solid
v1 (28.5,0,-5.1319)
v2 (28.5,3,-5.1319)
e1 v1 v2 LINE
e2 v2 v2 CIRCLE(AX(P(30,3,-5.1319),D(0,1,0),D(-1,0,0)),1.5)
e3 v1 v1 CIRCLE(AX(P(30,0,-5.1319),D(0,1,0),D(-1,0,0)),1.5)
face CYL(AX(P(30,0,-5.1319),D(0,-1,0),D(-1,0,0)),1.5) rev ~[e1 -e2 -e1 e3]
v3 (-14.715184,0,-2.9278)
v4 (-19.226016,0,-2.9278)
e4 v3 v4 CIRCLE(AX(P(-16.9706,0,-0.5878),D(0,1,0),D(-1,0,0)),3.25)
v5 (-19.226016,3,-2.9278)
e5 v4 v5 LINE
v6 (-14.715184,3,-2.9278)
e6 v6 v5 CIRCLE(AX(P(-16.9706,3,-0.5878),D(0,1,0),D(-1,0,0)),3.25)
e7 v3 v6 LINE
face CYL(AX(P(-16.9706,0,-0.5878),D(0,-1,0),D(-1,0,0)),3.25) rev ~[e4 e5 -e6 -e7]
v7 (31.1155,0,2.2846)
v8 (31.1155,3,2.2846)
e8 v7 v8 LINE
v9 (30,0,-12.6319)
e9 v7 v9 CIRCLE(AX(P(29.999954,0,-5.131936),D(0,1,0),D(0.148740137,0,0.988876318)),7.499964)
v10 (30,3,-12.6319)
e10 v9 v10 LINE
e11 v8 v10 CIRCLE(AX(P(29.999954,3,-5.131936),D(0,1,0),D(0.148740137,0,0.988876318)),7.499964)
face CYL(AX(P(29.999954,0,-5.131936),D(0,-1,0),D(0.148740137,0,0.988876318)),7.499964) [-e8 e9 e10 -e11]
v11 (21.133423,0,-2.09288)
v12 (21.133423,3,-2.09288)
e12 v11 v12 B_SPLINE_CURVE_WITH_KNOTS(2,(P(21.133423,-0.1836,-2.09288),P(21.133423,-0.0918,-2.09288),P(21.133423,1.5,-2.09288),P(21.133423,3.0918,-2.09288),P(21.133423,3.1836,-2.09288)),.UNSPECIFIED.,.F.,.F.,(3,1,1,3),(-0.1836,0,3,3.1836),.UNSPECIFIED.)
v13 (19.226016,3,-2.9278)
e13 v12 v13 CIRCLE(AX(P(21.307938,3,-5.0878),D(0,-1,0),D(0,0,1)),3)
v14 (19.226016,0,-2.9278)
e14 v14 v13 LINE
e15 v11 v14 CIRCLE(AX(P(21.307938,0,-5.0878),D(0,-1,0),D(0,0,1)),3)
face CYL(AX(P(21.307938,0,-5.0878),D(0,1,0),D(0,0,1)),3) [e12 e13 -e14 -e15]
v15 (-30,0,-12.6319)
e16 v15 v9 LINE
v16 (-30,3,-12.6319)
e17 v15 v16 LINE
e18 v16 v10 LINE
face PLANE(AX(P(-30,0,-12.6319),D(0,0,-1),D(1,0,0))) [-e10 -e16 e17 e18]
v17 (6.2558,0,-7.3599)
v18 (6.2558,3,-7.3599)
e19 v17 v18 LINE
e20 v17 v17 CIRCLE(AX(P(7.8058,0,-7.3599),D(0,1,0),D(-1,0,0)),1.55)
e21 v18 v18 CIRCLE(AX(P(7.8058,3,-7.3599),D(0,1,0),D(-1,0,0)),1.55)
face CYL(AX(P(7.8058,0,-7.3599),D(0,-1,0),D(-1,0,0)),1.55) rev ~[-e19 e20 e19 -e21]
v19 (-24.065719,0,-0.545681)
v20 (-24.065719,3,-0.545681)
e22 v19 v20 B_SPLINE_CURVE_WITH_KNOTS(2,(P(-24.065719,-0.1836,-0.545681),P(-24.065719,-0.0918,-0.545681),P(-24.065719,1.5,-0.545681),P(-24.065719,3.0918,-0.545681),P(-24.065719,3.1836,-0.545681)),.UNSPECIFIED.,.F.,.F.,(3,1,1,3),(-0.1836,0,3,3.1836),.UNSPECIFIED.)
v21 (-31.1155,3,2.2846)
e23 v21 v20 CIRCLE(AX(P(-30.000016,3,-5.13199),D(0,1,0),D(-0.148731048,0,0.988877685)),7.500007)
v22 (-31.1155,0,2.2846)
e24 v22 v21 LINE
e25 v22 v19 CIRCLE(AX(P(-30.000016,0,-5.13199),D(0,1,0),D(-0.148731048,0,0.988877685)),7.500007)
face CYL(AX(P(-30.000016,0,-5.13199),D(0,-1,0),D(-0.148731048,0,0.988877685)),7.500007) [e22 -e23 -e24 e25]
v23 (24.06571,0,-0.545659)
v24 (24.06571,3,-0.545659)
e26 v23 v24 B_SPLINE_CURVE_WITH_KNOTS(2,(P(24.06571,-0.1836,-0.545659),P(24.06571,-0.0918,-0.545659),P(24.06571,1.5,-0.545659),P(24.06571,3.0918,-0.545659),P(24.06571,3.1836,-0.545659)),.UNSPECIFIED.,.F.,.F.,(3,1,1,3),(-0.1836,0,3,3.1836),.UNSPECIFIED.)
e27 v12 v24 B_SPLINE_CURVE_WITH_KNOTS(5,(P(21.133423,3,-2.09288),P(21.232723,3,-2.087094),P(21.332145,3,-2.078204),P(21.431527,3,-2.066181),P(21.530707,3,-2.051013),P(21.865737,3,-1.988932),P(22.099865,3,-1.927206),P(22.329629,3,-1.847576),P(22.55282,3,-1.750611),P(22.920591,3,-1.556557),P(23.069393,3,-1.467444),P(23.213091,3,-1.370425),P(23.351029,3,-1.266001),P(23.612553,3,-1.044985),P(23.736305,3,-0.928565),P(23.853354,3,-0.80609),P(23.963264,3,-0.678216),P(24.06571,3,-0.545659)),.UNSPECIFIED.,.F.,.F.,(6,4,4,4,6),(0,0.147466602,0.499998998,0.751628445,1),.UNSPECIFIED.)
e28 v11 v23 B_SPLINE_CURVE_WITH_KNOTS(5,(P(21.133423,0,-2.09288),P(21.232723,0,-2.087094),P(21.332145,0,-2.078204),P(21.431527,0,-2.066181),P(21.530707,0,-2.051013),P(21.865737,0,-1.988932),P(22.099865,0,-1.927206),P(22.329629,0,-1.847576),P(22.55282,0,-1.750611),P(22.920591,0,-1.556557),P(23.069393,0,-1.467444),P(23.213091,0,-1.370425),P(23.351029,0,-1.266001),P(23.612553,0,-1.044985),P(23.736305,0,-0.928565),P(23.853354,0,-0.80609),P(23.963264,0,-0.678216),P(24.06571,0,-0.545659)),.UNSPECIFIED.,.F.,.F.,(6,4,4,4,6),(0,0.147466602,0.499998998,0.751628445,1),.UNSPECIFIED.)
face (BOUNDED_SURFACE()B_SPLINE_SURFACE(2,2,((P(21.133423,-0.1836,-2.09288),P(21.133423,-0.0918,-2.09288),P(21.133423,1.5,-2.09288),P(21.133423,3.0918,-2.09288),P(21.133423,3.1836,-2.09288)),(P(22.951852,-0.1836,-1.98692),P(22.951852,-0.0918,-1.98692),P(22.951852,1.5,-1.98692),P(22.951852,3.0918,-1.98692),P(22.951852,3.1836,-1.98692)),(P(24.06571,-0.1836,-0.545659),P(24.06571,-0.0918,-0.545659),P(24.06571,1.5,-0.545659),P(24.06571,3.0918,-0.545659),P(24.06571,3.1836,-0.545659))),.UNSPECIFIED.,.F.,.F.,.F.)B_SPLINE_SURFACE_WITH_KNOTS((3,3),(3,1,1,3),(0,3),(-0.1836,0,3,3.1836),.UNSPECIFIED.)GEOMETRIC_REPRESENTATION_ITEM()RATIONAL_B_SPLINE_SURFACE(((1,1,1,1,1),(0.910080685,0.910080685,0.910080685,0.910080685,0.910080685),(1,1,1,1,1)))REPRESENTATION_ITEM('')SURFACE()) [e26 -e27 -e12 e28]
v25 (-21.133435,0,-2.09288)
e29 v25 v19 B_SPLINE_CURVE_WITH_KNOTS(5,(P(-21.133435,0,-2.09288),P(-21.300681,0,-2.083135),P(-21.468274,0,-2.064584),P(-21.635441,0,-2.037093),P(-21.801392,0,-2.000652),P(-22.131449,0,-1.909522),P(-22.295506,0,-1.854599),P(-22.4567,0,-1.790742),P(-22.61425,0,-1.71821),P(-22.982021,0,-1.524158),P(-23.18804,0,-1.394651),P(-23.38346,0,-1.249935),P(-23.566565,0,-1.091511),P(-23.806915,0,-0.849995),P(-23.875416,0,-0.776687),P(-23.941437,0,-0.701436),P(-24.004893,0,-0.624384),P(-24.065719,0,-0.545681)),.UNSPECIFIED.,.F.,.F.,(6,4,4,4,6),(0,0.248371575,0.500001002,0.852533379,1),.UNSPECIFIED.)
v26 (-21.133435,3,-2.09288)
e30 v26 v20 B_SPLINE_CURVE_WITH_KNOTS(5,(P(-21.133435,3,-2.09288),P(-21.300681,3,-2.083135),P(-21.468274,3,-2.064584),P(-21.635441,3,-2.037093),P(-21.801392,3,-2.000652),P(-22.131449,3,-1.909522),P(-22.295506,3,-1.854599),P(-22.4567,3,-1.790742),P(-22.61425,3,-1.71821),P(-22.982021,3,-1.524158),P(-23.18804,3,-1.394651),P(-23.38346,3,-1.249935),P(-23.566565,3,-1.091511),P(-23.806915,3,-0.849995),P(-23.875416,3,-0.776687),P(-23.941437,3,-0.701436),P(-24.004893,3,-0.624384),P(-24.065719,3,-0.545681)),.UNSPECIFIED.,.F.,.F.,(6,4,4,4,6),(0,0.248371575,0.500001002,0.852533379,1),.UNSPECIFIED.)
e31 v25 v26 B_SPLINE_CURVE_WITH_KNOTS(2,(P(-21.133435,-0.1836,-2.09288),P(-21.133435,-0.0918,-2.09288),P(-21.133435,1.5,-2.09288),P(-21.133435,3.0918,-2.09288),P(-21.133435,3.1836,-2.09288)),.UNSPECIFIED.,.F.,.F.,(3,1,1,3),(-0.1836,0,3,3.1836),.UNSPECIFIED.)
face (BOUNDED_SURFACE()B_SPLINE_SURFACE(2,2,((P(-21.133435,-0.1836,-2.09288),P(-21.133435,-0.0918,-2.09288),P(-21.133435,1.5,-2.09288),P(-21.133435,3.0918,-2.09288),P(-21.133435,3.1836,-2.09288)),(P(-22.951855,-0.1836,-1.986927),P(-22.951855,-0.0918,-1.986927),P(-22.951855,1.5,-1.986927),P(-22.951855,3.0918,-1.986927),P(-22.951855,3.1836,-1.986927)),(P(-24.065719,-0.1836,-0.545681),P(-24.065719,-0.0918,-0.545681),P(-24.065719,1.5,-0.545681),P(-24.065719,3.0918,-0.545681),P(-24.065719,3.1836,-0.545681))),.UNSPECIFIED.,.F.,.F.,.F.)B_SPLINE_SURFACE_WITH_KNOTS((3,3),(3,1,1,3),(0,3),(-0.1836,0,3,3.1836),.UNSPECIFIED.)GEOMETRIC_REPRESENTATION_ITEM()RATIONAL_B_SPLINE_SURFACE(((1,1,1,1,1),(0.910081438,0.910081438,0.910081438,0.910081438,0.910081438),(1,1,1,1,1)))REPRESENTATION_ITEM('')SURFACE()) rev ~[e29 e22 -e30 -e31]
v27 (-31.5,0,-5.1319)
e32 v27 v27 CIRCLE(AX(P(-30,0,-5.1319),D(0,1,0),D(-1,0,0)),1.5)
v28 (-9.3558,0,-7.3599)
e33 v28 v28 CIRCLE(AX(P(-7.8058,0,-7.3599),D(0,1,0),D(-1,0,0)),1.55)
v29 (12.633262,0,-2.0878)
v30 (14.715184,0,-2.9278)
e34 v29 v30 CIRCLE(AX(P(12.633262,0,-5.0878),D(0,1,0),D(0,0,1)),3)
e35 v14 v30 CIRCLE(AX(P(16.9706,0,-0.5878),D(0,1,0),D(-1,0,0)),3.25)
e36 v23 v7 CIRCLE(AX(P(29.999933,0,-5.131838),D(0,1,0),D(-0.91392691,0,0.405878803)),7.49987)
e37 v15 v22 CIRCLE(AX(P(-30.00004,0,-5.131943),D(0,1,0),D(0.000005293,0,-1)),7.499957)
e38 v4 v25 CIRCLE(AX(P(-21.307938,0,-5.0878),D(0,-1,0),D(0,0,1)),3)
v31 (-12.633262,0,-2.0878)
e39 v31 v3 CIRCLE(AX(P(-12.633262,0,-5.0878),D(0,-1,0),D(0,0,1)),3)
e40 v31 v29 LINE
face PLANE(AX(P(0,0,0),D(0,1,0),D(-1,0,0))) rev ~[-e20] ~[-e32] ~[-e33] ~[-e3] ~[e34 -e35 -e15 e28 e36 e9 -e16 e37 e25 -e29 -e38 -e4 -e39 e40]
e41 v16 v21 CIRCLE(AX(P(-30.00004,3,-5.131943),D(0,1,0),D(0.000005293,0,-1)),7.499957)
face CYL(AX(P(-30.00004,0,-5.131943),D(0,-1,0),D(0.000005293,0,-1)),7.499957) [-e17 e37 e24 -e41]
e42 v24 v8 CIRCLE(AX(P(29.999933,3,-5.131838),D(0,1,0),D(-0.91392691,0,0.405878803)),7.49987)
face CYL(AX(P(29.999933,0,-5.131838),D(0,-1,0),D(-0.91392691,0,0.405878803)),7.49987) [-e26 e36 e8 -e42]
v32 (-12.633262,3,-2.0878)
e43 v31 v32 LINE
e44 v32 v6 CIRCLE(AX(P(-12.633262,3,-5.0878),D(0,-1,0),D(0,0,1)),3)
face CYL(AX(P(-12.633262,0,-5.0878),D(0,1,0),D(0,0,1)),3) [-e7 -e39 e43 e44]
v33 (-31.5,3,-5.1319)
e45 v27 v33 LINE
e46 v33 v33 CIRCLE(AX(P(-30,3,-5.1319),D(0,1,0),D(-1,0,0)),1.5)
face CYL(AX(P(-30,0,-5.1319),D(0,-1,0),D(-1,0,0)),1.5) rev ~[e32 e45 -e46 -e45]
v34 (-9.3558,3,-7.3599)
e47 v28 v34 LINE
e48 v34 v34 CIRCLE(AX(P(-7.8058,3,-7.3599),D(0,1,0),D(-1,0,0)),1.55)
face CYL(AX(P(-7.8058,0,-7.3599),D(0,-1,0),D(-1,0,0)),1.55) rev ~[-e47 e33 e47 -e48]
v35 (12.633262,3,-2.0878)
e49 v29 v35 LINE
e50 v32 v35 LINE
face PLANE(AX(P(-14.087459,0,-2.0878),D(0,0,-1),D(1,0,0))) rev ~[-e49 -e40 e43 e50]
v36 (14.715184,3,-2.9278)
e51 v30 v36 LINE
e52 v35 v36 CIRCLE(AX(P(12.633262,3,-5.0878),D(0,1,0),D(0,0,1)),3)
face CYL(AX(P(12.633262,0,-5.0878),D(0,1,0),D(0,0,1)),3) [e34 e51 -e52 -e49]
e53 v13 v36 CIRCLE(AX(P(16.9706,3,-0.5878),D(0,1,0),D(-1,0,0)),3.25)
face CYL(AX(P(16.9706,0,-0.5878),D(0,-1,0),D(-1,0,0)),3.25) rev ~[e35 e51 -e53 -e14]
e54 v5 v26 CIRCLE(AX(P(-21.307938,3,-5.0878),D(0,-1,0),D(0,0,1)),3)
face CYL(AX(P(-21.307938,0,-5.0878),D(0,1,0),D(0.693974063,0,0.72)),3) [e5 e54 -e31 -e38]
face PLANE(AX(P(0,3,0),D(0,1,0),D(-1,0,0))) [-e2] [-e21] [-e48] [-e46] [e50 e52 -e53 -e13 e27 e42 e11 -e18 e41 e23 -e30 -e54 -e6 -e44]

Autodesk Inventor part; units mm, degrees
ref_plane "YZ Plane" through (0, 0, 0) normal (1, 0, 0) x (0, 1, 0)
ref_plane "XZ Plane" through (0, 0, 0) normal (0, 1, 0) x (-1, 0, 0)
ref_plane "XY Plane" through (0, 0, 0) normal (0, 0, 1) x (1, 0, 0)
sketch "Sketch1" plane through (0, 0, 0) normal (0, 1, 0) x (-1, 0, 0)
  circle A0 centre (-16.9706, -0.5878) radius 1.5
  circle A1 centre (16.9706, -0.5878) radius 1.5
  circle A2 centre (30, -5.1319) radius 1.5
  circle A3 centre (-30, -5.1319) radius 1.5
  circle A4 centre (16.9706, -0.5878) radius 5 construction
  circle A5 centre (-16.9706, -0.5878) radius 5 construction
  arc A6 (-31.1155, 2.2846) -> (-30, -12.6319) centre (-30, -5.1319) ccw
  arc A7 (30, -12.6319) -> (31.1155, 2.2846) centre (30, -5.1319) ccw
  line L0 (30, -12.6319) -> (-30, -12.6319)
  line L1 (-16.9706, 4.4122) -> (16.9706, 4.4122)
  line L2 (-16.9706, 4.4122) -> (-31.1155, 2.2846)
  line L3 (16.9706, 4.4122) -> (31.1155, 2.2846)
  arc A8 (31.1155, 2.2846) -> (23.1456, -2.0878) centre (30, -5.1319) ccw
  arc A9 (-30, -12.6319) -> (-23.1456, -2.0878) centre (-30, -5.1319) ccw construction
  line L4 (0, 4.2106) -> (0, -4.2106) construction
  line L5 (0, -4.2106) -> (3.1574, -4.2106) construction
  line L6 (0, -4.2106) -> (0, -12.6319) construction
  circle A10 centre (0, 0) radius 1.55
  line L7 (0, -8.4213) -> (15.6117, -8.4213) construction
  line L8 (0, -8.4213) -> (-15.6117, -8.4213) construction
  circle A11 centre (7.8058, -8.4213) radius 1.55 construction
  circle A12 centre (-7.8058, -8.4213) radius 1.55 construction
  line L9 (16.9706, -2.0878) -> (-16.9706, -2.0878)
  line L10 (16.9706, -2.0878) -> (23.1456, -2.0878)
  line L11 (-16.9706, -2.0878) -> (-23.1456, -2.0878)
  arc A13 (-23.1456, -2.0878) -> (-31.1155, 2.2846) centre (-30, -5.1319) ccw
  arc A14 (23.1456, -2.0878) -> (30, -12.6319) centre (30, -5.1319) ccw construction
  line L12 (7.8058, -12.6319) -> (7.8058, -2.0878) construction
  line L13 (-7.8058, -12.6319) -> (-7.8058, -2.0878) construction
  line L14 (3.5375, -12.6319) -> (3.5375, -2.0878) construction
  line L15 (3.5375, -7.3599) -> (10.9646, -7.3599) construction
  line L16 (3.5375, -7.3599) -> (-12.9158, -7.3599) construction
  circle A15 centre (7.8058, -7.3599) radius 1.55
  circle A16 centre (-7.8058, -7.3599) radius 1.55
  circle A17 centre (-16.9706, -0.5878) radius 3.25
  circle A18 centre (16.9706, -0.5878) radius 3.25
  circle A19 centre (16.9706, -0.5878) radius 2.75 construction
  line L17 (15.3828, -3.3378) -> (13.7951, -0.5878) construction
  line L18 (13.7951, -0.5878) -> (15.3828, 2.1622) construction
  line L19 (15.3828, 2.1622) -> (18.5583, 2.1622) construction
  line L20 (18.5583, 2.1622) -> (20.146, -0.5878) construction
  line L21 (20.146, -0.5878) -> (18.5583, -3.3378) construction
  line L22 (18.5583, -3.3378) -> (15.3828, -3.3378) construction
  point P0 (0, 0)
  point P1 (19.8537, -2.0878)
  point P2 (14.0874, -2.0878)
  point P3 (-14.0874, -2.0878)
  point P4 (-19.8537, -2.0878)
  point P5 (16.9706, -3.3378)
  dimension "d0" = 10
  dimension "d1" = 10
  dimension "d20" = 5.5
  dimension "d2" = 15
  dimension "d3" = 15
  dimension "d4" = 3.1
  dimension "d5" = 3.1
  dimension "d6" = 3.1
  dimension "d13" = 10.5442
  dimension "d14" = 3.1
  dimension "d15" = 3.1
  dimension "d16" = 6.5
  dimension "d17" = 6.5
extrude "Extrusion1" add sketch "Sketch1" along normal blind 3 contours L9 A18 L10 A8 A7 L0 A6 A13 L11 A17
fillet "Fillet2" radius 3 4 edges at (-19.8537, 1.5, -2.0878) (-14.0874, 1.5, -2.0878) (14.0874, 1.5, -2.0878) (19.8537, 1.5, -2.0878)
fillet "Fillet3" radius 4 2 edges at (-23.1456, 1.5, -2.0878) (23.1456, 1.5, -2.0878)
properties part number "prig to kauri conversion plate"
